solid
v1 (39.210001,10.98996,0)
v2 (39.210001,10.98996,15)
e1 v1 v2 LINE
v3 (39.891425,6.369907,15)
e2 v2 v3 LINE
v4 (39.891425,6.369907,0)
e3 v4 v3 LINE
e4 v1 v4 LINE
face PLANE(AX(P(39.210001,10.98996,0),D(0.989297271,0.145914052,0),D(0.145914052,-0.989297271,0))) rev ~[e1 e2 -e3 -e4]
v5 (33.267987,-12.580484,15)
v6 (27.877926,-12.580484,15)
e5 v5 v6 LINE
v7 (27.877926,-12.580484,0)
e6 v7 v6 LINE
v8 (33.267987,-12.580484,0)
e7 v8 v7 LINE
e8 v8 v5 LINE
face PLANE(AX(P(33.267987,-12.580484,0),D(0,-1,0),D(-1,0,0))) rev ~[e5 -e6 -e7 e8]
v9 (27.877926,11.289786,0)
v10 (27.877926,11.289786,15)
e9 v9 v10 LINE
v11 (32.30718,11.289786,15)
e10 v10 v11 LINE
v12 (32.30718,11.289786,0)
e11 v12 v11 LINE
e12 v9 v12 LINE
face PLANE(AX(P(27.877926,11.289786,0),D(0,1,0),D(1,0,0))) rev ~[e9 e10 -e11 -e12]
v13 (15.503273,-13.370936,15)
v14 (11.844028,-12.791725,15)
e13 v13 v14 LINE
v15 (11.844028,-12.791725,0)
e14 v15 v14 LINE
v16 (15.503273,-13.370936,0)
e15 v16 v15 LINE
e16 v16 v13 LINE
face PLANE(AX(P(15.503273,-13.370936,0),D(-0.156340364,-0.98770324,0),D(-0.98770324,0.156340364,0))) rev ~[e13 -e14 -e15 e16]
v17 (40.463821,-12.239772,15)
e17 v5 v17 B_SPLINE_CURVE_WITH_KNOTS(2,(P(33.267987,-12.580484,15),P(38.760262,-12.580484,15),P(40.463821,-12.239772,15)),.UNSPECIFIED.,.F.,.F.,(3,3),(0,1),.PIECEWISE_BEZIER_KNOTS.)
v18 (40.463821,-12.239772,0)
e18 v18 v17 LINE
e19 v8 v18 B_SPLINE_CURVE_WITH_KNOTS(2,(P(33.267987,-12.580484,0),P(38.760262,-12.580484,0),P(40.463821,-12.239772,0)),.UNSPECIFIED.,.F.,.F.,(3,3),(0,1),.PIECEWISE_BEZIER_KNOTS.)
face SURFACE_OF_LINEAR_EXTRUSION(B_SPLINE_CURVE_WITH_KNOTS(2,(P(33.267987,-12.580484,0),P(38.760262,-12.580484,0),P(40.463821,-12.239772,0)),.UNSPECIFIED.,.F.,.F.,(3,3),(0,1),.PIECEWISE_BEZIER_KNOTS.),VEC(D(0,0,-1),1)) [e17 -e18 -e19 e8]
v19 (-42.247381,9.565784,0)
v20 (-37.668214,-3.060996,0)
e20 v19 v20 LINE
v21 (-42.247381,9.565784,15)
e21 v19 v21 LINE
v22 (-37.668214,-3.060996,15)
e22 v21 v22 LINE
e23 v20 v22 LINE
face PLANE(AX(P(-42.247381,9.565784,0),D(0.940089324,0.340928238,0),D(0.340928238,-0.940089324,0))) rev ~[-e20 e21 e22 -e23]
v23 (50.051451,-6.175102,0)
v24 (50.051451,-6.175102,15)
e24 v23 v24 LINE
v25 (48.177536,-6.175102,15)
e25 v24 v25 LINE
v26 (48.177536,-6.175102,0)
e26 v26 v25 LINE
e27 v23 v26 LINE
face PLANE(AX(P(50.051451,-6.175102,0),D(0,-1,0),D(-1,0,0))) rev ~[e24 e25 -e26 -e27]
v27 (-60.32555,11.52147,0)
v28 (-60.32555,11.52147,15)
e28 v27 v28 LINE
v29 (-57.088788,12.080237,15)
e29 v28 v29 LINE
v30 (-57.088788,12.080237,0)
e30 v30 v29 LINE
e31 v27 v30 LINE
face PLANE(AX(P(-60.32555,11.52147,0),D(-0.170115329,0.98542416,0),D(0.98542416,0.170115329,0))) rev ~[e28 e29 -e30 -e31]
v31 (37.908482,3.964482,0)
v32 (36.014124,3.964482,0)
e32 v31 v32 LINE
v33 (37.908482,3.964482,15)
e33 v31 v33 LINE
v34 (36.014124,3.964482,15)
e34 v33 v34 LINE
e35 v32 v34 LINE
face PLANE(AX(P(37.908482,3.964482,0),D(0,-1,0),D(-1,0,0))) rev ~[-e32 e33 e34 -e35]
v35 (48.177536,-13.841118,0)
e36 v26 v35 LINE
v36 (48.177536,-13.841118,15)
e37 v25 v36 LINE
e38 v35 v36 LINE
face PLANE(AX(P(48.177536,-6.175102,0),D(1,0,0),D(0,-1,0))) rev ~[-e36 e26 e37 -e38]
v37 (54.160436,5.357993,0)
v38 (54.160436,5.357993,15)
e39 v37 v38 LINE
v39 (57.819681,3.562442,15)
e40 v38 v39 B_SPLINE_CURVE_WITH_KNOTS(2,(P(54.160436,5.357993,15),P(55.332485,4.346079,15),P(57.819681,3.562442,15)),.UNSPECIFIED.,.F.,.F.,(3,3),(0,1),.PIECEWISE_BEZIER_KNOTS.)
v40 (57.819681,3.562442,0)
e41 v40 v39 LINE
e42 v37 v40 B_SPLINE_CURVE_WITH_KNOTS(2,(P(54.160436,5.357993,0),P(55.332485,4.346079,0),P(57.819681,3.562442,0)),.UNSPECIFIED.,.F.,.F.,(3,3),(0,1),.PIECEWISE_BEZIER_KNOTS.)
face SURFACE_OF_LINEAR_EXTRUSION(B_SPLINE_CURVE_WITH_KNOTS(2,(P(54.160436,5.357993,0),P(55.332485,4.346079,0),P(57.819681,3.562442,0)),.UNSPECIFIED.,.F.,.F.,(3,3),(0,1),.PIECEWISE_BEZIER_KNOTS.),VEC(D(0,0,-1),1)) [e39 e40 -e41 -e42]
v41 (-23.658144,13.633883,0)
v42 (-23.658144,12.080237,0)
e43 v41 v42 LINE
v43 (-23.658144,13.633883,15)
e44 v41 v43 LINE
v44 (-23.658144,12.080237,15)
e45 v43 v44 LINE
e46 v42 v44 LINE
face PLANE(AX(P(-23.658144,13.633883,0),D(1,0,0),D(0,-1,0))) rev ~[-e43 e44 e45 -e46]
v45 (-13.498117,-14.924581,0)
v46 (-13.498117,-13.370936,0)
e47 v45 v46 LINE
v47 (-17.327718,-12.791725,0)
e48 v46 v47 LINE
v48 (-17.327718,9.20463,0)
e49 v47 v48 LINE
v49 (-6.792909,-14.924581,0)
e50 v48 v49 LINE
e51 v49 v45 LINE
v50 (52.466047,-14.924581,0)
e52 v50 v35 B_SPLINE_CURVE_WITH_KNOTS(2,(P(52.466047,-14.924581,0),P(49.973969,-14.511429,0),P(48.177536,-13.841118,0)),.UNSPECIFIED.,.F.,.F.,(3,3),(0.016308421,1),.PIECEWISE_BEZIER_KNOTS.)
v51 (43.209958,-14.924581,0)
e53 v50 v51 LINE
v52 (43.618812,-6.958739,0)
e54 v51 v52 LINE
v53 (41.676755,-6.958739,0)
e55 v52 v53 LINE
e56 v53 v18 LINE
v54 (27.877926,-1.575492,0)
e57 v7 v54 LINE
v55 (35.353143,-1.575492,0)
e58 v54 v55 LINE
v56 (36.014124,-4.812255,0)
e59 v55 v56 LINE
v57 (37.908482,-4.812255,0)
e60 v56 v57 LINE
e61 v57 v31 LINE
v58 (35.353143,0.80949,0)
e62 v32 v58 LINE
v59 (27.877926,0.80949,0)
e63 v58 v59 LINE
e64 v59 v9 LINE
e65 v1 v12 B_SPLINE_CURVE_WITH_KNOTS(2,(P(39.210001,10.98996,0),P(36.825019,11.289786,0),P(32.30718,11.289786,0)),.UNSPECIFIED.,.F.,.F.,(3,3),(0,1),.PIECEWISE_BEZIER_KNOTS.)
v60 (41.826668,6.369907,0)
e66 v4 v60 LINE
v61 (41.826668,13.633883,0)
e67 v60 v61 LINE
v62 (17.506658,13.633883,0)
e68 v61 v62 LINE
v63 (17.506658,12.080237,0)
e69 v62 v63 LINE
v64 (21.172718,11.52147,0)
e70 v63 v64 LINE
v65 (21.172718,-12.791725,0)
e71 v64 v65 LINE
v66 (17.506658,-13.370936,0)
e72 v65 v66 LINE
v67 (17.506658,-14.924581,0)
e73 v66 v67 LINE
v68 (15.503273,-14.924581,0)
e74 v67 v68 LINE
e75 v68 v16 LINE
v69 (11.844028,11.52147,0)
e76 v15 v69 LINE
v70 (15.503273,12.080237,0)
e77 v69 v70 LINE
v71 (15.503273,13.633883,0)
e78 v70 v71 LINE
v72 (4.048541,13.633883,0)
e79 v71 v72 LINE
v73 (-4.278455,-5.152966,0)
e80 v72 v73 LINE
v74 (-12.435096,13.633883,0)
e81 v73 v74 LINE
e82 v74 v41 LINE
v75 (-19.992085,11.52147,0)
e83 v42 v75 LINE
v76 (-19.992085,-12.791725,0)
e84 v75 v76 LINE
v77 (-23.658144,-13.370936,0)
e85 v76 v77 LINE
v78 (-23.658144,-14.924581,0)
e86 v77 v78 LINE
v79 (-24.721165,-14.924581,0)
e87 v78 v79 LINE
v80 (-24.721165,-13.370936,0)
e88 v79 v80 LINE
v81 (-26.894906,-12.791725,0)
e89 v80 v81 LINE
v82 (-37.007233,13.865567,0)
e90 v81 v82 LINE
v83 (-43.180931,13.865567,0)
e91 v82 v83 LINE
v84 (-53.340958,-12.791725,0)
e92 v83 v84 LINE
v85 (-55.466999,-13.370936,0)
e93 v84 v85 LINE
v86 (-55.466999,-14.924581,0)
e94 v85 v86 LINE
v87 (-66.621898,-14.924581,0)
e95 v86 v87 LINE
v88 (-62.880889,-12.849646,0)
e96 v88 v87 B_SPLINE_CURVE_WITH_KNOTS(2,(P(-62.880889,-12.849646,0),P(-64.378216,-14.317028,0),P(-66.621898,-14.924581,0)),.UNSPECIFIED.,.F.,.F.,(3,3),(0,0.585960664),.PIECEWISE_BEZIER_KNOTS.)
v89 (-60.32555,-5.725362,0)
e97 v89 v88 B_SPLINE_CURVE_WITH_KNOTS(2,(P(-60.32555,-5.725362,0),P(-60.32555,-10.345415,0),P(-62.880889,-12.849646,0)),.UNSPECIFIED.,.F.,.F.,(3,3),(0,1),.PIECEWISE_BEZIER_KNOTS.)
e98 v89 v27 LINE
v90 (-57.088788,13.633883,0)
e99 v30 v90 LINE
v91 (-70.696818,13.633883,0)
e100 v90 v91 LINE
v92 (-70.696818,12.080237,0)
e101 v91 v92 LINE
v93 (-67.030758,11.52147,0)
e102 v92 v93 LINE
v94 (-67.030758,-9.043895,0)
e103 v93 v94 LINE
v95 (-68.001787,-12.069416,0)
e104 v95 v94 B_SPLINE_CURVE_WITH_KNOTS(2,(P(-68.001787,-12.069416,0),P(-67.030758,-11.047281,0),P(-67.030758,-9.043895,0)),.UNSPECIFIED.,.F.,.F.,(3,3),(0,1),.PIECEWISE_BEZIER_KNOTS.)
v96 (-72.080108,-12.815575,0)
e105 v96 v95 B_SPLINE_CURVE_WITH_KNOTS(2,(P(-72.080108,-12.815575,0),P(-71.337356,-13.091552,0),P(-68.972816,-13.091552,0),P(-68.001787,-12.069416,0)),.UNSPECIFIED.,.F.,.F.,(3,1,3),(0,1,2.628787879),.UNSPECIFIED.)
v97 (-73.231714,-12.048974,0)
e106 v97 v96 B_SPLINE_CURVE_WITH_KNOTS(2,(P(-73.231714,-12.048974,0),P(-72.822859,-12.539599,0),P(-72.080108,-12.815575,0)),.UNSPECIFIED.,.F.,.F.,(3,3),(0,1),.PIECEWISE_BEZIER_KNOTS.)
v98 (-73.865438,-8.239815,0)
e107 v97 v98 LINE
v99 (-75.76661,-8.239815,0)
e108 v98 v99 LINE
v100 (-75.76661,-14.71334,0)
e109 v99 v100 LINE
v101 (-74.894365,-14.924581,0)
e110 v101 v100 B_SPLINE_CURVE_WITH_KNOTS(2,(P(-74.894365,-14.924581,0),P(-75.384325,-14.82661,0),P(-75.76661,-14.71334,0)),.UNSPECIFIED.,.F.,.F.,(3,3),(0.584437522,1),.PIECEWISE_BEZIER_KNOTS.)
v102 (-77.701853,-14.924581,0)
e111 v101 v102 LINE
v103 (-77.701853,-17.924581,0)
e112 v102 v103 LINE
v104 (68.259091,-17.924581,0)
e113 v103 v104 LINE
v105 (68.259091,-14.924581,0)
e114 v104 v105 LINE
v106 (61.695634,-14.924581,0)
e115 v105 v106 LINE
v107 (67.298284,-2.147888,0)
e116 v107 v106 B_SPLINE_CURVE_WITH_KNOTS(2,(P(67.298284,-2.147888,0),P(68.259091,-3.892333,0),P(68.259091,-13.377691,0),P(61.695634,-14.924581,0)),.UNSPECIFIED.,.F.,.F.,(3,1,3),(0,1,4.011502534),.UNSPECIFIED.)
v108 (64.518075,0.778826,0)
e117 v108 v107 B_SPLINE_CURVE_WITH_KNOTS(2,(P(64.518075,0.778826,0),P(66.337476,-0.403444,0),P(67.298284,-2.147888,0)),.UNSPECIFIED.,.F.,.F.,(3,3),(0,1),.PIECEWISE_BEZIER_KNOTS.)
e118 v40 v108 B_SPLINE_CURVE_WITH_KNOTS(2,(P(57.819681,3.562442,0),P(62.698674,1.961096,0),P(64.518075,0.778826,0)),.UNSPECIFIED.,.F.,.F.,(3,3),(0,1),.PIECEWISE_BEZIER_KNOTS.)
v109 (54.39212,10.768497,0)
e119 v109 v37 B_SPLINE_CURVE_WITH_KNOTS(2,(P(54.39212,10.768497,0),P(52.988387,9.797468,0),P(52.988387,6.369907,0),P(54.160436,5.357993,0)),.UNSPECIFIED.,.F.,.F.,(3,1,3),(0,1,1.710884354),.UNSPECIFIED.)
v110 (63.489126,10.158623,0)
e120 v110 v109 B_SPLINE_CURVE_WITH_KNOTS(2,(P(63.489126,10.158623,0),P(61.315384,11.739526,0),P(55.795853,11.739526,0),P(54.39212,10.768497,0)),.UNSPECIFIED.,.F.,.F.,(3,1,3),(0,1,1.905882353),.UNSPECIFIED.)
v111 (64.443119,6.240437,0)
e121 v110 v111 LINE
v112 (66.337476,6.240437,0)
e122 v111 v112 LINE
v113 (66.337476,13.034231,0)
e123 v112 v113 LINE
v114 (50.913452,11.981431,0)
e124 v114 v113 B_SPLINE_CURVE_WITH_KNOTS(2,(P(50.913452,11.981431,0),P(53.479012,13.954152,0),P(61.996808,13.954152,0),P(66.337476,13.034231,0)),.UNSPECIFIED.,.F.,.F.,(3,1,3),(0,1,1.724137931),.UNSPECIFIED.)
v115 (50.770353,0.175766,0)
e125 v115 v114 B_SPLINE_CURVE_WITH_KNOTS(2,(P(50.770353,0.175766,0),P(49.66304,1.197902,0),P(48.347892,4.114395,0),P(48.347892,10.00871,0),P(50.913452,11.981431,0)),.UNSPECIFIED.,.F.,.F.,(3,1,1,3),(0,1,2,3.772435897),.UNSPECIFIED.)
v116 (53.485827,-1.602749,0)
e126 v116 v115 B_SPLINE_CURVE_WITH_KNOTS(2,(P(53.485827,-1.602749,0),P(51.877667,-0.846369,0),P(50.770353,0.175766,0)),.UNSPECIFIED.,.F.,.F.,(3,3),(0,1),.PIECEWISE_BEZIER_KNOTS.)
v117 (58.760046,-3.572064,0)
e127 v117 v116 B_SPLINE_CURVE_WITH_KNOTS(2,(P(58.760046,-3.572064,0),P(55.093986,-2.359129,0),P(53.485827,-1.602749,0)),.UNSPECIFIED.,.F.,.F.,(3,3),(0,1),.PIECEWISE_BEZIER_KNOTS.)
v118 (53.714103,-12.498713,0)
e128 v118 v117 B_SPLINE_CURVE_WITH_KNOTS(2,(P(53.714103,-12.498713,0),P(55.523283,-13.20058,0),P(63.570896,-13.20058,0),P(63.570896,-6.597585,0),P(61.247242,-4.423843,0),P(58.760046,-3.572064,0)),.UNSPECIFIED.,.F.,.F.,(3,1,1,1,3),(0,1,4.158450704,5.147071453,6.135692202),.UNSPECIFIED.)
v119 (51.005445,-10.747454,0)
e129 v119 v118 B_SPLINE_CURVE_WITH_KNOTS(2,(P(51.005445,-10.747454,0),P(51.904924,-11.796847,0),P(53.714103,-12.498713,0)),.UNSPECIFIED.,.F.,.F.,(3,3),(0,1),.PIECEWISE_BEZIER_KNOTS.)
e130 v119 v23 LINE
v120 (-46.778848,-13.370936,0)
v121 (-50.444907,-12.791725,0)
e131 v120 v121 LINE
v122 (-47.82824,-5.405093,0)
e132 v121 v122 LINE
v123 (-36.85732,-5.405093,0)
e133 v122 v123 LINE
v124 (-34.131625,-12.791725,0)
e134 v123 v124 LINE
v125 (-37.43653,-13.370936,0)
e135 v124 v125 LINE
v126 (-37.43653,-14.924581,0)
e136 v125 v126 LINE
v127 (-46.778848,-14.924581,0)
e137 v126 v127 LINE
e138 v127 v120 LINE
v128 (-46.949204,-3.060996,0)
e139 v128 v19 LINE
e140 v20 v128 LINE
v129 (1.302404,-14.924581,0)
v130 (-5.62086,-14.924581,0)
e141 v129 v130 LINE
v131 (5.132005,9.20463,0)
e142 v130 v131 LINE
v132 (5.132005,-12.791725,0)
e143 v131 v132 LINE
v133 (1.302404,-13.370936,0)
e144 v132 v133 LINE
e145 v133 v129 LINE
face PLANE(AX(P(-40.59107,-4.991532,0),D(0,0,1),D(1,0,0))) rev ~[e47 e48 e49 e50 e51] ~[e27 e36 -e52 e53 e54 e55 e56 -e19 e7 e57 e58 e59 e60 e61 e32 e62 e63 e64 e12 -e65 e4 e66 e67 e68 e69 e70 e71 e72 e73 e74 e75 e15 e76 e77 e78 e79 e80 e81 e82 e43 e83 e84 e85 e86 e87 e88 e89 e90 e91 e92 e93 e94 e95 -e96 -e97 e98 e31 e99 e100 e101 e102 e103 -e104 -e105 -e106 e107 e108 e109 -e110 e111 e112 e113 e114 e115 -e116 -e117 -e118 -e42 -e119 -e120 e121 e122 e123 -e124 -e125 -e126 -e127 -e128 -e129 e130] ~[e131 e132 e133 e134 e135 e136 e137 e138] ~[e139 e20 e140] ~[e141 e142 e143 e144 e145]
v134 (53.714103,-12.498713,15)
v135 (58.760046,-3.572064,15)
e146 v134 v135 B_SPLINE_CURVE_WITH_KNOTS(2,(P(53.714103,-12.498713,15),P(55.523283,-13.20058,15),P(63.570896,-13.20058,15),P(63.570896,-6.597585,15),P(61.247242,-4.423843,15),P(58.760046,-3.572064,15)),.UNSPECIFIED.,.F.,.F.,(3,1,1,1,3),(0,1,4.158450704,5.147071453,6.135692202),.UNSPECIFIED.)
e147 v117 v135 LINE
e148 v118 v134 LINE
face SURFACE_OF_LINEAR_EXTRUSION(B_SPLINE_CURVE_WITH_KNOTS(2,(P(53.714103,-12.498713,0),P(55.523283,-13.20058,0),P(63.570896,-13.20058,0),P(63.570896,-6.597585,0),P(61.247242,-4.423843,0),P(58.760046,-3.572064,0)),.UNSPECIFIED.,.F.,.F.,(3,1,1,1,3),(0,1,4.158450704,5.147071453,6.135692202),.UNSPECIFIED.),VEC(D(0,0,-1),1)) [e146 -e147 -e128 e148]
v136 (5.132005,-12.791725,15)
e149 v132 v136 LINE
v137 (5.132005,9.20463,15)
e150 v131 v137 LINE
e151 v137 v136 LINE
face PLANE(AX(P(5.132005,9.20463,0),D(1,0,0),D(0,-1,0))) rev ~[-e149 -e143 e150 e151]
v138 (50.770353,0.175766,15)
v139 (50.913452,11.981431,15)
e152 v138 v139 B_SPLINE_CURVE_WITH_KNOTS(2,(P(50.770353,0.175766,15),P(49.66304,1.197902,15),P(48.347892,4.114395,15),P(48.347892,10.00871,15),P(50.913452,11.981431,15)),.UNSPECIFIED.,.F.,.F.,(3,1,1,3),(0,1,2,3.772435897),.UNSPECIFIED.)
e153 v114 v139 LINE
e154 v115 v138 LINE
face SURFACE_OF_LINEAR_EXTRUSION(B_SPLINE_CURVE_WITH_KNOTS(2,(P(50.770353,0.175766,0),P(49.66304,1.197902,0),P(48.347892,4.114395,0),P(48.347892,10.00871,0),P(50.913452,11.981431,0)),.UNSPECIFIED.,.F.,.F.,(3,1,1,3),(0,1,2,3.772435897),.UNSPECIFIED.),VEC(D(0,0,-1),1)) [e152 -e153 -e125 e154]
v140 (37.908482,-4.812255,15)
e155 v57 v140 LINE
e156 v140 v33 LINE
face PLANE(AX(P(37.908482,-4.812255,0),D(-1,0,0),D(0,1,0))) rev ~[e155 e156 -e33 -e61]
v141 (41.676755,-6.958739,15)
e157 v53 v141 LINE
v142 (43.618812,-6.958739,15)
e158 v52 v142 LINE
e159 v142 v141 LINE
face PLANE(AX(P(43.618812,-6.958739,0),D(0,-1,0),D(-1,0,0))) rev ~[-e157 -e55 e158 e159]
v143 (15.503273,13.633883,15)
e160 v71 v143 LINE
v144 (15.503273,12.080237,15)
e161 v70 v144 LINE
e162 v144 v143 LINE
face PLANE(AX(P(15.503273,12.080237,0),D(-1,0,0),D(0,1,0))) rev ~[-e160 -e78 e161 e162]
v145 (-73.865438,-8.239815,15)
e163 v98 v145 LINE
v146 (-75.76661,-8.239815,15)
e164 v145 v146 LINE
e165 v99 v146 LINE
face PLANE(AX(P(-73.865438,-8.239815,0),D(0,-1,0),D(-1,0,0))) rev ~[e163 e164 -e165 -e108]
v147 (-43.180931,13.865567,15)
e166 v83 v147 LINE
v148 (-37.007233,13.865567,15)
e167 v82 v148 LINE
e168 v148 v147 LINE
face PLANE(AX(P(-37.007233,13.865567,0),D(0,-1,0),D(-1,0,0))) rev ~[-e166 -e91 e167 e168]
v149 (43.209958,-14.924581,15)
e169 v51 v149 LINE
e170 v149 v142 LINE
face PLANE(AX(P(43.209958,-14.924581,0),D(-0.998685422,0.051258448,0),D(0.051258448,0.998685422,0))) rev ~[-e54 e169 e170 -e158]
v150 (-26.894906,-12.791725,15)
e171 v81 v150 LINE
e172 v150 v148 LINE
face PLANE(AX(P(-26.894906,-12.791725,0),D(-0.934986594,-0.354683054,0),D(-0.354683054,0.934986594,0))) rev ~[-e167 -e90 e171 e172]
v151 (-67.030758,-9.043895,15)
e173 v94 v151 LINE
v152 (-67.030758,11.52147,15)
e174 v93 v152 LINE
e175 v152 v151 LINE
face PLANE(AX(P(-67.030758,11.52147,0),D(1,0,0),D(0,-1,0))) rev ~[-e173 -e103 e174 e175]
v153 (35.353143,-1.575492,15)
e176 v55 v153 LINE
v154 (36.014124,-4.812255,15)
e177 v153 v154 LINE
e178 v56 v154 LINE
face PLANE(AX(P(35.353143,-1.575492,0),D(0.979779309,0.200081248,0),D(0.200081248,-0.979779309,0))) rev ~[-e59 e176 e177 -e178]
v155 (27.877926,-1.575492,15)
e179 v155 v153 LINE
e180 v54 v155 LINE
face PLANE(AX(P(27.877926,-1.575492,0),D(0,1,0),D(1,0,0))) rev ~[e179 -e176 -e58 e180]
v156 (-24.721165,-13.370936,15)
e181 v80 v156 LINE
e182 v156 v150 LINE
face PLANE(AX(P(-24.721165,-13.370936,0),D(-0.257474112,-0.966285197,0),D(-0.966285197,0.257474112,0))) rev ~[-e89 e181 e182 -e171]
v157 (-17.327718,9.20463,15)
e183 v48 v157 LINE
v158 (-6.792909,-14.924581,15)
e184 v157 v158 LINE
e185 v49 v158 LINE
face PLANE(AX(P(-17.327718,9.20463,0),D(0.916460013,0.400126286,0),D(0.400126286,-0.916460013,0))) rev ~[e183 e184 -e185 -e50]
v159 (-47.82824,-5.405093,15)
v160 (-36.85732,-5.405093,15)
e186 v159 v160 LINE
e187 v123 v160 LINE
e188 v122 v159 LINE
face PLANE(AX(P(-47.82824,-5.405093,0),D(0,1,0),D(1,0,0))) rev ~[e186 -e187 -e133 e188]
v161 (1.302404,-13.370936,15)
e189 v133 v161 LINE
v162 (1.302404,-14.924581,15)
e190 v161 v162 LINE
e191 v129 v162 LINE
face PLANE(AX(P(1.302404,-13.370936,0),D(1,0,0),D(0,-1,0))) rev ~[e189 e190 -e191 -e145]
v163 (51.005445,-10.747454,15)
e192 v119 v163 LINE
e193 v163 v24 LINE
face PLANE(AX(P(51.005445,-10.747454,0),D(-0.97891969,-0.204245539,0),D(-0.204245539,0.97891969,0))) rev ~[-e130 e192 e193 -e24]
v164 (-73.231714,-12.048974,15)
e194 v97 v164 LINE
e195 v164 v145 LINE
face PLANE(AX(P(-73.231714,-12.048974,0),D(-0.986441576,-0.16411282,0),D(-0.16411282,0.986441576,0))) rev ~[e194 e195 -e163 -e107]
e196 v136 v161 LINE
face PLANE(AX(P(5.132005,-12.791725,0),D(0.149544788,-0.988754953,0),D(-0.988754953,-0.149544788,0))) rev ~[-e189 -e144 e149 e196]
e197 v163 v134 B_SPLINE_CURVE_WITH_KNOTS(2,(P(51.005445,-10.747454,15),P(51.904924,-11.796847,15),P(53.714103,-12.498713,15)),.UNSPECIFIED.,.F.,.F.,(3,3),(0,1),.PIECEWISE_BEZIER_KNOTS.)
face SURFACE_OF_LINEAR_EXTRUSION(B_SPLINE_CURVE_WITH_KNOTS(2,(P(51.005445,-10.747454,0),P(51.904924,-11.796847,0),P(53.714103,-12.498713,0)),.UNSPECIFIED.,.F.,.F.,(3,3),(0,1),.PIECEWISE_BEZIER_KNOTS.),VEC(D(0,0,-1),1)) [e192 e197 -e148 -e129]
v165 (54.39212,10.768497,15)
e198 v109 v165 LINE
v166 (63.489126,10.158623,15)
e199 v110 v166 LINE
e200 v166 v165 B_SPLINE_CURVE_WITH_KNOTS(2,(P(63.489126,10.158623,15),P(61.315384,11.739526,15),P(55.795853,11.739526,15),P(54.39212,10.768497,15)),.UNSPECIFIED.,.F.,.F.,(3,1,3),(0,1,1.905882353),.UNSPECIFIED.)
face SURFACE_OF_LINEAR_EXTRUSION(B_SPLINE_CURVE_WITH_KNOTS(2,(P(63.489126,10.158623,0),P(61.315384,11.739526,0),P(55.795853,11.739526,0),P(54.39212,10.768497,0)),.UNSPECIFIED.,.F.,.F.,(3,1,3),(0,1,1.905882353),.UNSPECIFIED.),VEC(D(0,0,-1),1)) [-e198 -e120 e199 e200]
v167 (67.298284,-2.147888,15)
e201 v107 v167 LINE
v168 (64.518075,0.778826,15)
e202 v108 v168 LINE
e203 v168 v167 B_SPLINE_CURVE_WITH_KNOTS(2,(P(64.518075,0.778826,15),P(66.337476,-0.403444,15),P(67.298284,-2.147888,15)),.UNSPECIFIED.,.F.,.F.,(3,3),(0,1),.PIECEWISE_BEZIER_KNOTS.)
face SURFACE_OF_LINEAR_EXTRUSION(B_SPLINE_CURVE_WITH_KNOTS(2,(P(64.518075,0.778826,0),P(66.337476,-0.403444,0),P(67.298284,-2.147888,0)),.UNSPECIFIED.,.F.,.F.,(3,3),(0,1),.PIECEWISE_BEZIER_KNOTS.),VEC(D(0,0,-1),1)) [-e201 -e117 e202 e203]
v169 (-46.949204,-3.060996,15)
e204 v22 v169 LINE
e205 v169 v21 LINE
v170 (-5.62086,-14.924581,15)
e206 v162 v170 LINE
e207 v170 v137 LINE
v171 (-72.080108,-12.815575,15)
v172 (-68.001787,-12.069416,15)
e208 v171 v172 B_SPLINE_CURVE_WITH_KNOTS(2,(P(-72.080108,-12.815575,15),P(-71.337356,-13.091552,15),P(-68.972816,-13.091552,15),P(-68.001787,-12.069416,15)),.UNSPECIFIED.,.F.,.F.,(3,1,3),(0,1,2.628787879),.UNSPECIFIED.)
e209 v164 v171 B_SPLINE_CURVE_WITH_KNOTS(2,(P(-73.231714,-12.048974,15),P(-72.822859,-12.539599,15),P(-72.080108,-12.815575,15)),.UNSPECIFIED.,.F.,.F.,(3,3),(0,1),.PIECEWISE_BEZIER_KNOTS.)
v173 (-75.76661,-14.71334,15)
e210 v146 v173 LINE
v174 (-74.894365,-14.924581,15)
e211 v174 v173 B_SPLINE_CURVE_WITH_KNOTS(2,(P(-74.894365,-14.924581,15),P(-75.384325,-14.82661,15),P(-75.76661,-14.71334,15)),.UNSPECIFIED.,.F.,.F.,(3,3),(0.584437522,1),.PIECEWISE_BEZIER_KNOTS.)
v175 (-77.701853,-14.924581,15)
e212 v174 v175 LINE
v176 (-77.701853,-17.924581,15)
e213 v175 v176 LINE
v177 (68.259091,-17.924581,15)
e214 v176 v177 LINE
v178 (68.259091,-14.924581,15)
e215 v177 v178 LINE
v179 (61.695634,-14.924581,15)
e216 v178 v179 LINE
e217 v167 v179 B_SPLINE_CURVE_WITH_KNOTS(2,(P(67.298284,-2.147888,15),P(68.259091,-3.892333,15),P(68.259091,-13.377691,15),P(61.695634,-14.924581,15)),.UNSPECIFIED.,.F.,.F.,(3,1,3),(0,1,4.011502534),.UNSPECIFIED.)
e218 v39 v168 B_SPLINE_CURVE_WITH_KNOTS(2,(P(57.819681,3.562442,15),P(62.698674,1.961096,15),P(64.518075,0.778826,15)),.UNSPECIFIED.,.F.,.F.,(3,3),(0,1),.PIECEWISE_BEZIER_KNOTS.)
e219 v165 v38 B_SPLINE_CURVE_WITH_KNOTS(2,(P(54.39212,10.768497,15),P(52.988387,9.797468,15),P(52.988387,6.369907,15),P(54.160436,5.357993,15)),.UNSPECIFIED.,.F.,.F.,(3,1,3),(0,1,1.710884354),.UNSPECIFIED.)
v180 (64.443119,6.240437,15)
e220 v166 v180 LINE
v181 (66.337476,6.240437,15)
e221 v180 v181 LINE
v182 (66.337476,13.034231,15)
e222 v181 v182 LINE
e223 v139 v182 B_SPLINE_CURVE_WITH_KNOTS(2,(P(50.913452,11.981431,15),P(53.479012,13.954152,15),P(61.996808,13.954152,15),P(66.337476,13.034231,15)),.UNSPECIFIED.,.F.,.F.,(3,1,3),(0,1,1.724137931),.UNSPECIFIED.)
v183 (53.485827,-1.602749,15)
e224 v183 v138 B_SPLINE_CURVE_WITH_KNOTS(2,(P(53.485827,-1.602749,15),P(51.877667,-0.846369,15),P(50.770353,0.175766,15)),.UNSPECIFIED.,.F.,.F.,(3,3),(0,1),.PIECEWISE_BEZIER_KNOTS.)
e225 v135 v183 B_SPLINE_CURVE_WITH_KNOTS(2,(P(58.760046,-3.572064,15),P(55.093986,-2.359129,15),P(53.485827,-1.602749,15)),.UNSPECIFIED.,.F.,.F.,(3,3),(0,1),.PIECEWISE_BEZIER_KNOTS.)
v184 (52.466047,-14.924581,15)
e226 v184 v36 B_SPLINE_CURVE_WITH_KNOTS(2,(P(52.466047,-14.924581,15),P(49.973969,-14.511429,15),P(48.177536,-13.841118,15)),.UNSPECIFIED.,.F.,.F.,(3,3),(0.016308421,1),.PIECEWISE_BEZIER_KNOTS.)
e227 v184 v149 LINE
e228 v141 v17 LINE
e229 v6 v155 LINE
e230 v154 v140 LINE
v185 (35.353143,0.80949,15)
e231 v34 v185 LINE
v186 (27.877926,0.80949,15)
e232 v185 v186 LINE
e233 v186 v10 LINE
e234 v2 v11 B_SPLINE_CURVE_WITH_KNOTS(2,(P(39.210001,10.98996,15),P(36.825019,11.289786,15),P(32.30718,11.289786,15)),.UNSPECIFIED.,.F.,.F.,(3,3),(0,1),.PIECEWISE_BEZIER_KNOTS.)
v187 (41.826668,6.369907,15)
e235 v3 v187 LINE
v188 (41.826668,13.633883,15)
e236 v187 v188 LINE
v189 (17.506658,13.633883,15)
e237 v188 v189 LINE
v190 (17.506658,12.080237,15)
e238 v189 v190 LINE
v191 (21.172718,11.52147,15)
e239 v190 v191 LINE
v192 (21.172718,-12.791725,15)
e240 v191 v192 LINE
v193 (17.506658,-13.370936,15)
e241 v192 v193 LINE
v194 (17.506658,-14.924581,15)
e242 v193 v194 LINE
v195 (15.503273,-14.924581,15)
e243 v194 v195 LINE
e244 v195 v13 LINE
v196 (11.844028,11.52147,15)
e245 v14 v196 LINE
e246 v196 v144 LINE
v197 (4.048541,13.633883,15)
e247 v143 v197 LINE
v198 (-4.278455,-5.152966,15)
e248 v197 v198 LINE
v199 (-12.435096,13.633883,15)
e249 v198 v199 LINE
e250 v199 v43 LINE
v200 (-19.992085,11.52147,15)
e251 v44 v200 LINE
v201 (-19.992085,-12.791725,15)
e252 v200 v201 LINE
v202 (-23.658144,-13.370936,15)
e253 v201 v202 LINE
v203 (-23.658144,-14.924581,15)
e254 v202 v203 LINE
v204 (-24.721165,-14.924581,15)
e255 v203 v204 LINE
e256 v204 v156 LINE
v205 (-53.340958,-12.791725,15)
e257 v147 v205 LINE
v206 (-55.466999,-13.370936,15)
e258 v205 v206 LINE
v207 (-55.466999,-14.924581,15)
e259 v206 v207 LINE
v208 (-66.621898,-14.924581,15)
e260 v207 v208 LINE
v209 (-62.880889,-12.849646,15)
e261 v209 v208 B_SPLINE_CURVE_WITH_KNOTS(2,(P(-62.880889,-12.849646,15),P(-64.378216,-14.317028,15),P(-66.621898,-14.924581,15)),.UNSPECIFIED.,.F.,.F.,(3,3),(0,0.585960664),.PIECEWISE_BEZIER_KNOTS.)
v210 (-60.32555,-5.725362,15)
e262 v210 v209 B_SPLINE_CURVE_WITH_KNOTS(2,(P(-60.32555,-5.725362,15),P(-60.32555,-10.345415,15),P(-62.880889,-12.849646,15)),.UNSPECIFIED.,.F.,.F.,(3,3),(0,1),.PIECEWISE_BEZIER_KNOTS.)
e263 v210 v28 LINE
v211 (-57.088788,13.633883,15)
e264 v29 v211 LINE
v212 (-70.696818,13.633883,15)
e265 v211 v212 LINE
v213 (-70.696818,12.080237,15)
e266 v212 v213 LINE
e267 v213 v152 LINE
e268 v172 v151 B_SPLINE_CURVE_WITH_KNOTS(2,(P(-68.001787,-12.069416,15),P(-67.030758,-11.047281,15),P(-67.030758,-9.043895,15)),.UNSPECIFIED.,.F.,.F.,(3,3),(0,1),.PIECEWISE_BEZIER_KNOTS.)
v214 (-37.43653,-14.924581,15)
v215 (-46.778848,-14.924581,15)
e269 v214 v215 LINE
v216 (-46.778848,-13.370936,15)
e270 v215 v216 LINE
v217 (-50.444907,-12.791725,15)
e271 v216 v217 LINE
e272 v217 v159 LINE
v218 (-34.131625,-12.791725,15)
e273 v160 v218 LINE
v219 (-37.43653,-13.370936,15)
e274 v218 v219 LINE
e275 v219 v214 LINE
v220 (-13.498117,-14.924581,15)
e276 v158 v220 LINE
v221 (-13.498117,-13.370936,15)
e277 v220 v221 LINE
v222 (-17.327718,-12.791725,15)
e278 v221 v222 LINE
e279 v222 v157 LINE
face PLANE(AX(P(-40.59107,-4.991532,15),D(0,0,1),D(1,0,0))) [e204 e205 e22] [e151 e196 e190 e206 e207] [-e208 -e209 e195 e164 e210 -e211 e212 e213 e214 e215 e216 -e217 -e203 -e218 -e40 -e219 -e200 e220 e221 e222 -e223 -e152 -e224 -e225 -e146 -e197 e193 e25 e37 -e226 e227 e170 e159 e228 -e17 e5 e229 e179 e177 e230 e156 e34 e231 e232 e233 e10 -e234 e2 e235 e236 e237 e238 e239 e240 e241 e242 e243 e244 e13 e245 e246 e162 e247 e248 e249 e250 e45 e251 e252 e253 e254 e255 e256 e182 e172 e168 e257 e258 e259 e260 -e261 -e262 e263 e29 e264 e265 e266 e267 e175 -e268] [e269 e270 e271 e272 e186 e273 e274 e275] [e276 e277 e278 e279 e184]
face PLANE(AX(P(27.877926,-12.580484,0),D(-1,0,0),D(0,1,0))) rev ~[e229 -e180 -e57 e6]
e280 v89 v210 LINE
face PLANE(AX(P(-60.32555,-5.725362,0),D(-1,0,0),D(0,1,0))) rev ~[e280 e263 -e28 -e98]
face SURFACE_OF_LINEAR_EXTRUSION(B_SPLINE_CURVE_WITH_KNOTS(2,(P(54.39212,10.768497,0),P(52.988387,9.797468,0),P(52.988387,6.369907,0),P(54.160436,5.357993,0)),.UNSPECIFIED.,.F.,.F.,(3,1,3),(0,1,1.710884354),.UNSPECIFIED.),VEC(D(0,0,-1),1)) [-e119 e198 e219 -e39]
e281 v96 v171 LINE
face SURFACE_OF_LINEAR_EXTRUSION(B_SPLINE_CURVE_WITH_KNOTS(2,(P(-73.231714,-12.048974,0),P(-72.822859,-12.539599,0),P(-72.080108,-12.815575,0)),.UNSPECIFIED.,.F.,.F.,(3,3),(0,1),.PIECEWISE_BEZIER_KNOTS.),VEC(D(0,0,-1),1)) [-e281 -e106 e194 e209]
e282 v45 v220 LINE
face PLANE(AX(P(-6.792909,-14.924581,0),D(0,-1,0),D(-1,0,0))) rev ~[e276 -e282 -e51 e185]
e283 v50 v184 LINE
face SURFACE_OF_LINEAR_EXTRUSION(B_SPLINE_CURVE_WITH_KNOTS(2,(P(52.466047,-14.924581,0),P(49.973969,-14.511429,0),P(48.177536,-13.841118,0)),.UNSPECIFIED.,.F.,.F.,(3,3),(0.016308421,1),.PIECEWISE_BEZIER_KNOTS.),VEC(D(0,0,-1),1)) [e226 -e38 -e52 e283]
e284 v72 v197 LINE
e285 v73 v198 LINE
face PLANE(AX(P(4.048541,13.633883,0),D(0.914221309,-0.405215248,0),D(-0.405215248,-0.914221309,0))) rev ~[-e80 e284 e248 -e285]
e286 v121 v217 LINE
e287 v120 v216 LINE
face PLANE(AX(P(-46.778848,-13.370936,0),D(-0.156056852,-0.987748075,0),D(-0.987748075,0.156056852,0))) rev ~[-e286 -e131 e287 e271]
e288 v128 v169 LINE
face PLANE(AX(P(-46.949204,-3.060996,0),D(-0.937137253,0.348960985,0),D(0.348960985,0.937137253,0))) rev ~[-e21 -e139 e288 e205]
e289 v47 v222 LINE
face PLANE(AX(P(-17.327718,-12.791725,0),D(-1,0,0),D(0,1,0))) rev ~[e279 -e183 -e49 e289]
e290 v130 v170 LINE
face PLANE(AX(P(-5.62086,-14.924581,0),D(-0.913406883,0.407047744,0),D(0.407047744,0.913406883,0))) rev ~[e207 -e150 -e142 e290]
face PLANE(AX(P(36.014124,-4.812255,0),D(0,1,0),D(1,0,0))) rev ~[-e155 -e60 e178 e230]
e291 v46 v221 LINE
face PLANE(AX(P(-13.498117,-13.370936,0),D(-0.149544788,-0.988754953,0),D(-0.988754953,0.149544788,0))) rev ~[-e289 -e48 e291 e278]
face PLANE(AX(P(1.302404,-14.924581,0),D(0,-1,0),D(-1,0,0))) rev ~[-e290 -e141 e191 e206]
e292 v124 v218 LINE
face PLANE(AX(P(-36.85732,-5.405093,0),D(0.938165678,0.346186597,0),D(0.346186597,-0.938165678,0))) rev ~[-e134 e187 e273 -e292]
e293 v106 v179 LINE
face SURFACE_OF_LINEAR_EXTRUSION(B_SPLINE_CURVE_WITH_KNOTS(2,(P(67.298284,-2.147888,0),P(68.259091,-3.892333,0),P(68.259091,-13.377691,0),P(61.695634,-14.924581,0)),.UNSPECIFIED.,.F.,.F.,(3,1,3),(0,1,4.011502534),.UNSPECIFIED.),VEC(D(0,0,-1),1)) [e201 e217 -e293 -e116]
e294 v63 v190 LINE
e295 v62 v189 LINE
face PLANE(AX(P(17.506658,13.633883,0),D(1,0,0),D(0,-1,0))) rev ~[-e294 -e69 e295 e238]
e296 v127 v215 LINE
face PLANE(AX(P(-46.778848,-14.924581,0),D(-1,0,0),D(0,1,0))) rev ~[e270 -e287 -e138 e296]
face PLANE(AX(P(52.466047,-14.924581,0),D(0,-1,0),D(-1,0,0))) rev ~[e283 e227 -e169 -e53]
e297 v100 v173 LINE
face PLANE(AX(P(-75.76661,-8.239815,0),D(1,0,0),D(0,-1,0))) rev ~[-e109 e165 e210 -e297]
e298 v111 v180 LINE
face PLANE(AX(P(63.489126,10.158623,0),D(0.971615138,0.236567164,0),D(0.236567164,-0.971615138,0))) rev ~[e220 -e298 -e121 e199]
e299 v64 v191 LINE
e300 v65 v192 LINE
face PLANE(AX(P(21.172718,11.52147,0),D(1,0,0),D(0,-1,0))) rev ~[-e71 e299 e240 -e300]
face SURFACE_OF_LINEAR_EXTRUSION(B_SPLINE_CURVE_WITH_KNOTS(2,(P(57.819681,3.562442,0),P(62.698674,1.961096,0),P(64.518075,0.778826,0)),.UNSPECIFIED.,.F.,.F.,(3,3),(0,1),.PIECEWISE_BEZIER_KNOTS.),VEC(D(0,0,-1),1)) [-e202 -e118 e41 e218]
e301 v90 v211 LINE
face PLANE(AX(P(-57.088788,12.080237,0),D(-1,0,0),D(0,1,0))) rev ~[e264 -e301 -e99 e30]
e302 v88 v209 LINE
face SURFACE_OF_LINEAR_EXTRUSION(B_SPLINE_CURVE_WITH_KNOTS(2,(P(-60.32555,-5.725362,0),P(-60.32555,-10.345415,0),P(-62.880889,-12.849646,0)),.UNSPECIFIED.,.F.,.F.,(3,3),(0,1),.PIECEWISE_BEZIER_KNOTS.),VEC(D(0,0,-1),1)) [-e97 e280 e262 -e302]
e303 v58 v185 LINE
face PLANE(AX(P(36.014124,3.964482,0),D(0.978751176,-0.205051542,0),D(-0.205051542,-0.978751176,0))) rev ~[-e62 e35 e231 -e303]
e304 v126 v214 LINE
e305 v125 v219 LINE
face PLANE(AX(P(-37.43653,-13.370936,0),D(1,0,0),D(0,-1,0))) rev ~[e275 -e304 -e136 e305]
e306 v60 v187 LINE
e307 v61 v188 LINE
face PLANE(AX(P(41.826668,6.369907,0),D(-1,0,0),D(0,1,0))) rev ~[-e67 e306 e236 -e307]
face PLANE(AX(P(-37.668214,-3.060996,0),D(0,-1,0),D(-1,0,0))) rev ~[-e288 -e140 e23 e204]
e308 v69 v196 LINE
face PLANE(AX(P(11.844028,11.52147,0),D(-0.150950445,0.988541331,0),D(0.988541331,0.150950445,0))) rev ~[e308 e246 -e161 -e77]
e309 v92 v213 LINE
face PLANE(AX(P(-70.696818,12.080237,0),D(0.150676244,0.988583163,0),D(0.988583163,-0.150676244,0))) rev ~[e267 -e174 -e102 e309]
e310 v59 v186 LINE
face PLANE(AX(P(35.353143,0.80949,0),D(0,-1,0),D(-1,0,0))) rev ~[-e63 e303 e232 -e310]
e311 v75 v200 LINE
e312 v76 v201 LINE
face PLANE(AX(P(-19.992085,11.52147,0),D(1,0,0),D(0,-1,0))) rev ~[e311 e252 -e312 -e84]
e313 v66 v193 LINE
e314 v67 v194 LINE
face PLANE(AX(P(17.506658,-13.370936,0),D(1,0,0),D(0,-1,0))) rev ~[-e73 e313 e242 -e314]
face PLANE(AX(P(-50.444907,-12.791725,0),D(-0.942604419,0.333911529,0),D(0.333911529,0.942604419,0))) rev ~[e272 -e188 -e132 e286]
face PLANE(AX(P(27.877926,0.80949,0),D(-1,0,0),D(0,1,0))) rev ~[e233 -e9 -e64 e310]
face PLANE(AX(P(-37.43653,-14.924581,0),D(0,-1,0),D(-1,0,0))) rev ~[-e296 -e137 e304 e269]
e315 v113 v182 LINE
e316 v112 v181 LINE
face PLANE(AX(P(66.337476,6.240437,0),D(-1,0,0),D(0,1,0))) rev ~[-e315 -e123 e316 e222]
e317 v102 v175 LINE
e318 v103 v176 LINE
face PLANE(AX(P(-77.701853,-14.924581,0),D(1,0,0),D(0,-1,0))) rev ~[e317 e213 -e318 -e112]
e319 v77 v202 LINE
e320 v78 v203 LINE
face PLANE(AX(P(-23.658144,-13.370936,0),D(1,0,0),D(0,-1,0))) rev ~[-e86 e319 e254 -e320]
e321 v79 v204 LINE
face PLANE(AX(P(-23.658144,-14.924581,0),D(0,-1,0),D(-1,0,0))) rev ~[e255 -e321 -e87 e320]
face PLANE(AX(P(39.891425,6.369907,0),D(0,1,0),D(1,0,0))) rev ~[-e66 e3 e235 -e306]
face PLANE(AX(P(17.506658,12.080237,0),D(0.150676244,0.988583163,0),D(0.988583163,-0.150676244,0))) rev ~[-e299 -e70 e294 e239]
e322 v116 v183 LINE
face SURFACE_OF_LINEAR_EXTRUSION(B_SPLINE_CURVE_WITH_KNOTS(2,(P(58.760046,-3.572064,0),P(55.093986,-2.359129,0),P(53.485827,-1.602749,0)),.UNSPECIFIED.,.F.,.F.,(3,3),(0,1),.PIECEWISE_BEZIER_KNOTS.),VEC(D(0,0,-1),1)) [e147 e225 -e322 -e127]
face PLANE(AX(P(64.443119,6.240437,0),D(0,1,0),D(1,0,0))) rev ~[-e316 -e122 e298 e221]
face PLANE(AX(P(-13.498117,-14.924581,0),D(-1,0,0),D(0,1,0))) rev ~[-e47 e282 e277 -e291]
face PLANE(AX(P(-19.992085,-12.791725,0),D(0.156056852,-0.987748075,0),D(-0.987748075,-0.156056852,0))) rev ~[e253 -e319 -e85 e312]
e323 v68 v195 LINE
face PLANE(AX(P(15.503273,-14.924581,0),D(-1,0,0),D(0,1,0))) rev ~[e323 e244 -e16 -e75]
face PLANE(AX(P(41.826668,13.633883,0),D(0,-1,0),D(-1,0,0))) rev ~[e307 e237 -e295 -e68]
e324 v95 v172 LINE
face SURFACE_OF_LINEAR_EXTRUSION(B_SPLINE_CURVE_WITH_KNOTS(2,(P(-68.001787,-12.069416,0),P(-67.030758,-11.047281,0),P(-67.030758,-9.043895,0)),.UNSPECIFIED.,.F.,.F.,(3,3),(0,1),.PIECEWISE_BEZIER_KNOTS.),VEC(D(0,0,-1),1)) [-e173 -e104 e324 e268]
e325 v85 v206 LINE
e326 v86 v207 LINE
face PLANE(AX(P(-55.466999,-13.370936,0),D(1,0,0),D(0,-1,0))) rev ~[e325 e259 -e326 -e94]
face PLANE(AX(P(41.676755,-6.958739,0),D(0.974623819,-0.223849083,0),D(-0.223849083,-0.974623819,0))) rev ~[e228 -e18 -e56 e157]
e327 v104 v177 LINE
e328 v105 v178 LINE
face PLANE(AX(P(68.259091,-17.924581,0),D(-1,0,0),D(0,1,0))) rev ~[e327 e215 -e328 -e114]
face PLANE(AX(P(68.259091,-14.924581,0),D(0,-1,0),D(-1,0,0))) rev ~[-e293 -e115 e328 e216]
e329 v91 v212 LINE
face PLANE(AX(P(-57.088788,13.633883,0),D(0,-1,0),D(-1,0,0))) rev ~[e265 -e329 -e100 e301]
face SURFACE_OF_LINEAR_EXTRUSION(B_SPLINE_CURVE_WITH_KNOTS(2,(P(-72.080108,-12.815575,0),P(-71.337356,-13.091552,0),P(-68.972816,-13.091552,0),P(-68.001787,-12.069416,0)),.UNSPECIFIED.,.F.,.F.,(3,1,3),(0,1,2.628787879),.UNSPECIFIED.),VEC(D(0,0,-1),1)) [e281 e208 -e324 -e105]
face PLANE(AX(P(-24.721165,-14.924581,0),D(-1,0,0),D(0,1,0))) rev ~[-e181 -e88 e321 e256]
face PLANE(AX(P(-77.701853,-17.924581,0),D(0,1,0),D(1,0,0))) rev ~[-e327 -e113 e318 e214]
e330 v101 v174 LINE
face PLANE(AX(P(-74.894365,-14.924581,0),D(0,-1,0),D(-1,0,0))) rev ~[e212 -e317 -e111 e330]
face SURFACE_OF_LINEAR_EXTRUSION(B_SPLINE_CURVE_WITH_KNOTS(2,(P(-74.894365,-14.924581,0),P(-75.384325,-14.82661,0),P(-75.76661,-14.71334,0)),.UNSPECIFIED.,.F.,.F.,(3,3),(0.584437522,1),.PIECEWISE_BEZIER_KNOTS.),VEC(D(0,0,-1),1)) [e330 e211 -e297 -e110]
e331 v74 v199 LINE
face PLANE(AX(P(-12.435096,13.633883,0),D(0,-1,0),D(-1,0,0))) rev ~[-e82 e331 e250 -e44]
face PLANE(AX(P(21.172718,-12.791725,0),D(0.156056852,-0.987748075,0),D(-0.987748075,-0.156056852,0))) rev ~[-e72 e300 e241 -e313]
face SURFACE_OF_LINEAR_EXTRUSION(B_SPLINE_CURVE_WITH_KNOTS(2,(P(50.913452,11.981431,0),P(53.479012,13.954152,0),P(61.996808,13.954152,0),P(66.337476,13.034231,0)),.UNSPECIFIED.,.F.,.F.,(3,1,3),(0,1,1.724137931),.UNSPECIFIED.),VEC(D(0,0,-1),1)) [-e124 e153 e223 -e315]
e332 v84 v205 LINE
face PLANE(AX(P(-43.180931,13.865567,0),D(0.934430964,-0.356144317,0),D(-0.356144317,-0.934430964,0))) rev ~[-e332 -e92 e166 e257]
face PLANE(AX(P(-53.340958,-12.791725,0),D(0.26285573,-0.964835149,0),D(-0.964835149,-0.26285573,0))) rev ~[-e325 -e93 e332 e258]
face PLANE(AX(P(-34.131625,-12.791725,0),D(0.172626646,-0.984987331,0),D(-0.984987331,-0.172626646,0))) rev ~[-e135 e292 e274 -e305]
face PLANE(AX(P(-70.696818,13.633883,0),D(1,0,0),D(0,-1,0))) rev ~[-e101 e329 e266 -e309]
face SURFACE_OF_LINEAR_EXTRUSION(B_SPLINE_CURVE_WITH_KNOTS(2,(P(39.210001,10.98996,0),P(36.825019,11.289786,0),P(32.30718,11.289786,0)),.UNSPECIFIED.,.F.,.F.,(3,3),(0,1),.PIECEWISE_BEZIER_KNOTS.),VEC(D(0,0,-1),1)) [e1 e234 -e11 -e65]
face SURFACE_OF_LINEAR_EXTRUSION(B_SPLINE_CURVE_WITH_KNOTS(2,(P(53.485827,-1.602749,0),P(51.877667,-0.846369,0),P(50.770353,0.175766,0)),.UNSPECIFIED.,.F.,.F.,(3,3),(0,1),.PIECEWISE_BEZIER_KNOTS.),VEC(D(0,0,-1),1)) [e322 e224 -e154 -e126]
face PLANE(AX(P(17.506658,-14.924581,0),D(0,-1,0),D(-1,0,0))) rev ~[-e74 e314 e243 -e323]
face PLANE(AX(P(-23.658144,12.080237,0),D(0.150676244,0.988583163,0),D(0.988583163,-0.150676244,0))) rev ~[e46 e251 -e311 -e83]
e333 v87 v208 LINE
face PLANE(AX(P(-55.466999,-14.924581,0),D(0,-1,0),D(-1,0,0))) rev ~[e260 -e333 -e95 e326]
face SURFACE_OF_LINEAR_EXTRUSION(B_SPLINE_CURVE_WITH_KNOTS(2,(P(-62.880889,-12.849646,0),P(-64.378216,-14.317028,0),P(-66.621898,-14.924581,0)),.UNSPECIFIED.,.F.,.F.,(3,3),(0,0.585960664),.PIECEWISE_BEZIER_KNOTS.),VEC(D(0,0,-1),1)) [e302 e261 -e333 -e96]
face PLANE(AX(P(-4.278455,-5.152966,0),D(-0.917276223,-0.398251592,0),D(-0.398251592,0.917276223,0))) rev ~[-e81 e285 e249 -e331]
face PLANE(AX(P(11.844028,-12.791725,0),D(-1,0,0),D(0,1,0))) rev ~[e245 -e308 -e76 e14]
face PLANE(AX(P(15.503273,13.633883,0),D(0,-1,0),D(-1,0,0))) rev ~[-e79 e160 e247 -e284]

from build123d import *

# Parameters (mm, degrees)
F1_DEPTH = 15


with BuildPart() as f1:
    # F0 (on Top) → F1 (new body)
    with BuildSketch(Plane.XY):
        Polygon((-55.4669993083, -13.3709355081), (-55.4669993083, -14.9245814085), (-46.7788478918, -14.9245814085), (-46.7788478918, -13.3709355081), (-50.4449070777, -12.7917254137), (-47.8282402981, -5.4050931505), (-36.8573196859, -5.4050931505), (-34.1316251238, -12.7917254137), (-37.4365297803, -13.3709355081), (-37.4365297803, -14.9245814085), (-24.7211646484, -14.9245814085), (-24.7211646484, -13.3709355081), (-26.8949060616, -12.7917254137), (-37.0072328868, 13.8655674032), (-43.1809310698, 13.8655674032), (-53.3409575499, -12.7917254137), align=None)
        Polygon((-46.9492038019, -3.0609958272), (-42.2473806823, 9.5657842315), (-37.6682138181, -3.0609958272), align=None, mode=Mode.SUBTRACT)
        with BuildLine():
            Line((-46.7788478918, -14.9245814085), (-55.4669993083, -14.9245814085))
            Line((-55.4669993083, -14.9245814085), (-66.6218982829, -14.9245814085))
            add(Edge.make_bspline(
                [(-66.6218982829, -14.9245814085), (-68.2072820659, -15.353878302), (-70.1653072341, -15.353878302)],
                knots=[0.5859606644, 0.5859606644, 0.5859606644, 1, 1, 1], degree=2))
            add(Edge.make_bspline(
                [(-70.1653072341, -15.353878302), (-71.7598385529, -15.353878302), (-73.3032630987, -15.1698939191)],
                knots=[0, 0, 0, 1, 1, 1], degree=2))
            add(Edge.make_bspline(
                [(-73.3032630987, -15.1698939191), (-74.2052983154, -15.0623665423), (-74.8943654736, -14.9245814085)],
                knots=[0, 0, 0, 0.5844375218, 0.5844375218, 0.5844375218], degree=2))
            Line((-74.8943654736, -14.9245814085), (-77.7018526982, -14.9245814085))
            Line((-77.7018526982, -14.9245814085), (-77.7018526982, -17.9245814085))
            Line((-77.7018526982, -17.9245814085), (68.2590910996, -17.9245814085))
            Line((68.2590910996, -17.9245814085), (68.2590910996, -14.9245814085))
            Line((68.2590910996, -14.9245814085), (61.695634433, -14.9245814085))
            add(Edge.make_bspline(
                [(61.695634433, -14.9245814085), (59.8741275274, -15.353878302), (57.5471114707, -15.353878302)],
                knots=[0.7827650782, 0.7827650782, 0.7827650782, 1, 1, 1], degree=2))
            add(Edge.make_bspline(
                [(57.5471114707, -15.353878302), (55.0939863649, -15.353878302), (52.5488690676, -14.9382098813)],
                knots=[0, 0, 0, 1, 1, 1], degree=2))
            add(Edge.make_bspline(
                [(52.5488690676, -14.9382098813), (52.5073622228, -14.9314309856), (52.4660465805, -14.9245814085)],
                knots=[0, 0, 0, 0.0163084212, 0.0163084212, 0.0163084212], degree=2))
            Line((52.4660465805, -14.9245814085), (43.2099580743, -14.9245814085))
            Line((43.2099580743, -14.9245814085), (17.5066583542, -14.9245814085))
            Line((17.5066583542, -14.9245814085), (15.5032728511, -14.9245814085))
            Line((15.5032728511, -14.9245814085), (1.3024041828, -14.9245814085))
            Line((1.3024041828, -14.9245814085), (-5.6208600048, -14.9245814085))
            Line((-5.6208600048, -14.9245814085), (-6.7929086665, -14.9245814085))
            Line((-6.7929086665, -14.9245814085), (-13.4981172891, -14.9245814085))
            Line((-13.4981172891, -14.9245814085), (-23.6581437692, -14.9245814085))
            Line((-23.6581437692, -14.9245814085), (-24.7211646484, -14.9245814085))
            Line((-24.7211646484, -14.9245814085), (-37.4365297803, -14.9245814085))
            Line((-37.4365297803, -14.9245814085), (-46.7788478918, -14.9245814085))
        make_face()
        with BuildLine():
            add(Edge.make_bspline(
                [(-66.6218982829, -14.9245814085), (-68.2072820659, -15.353878302), (-70.1653072341, -15.353878302)],
                knots=[0.5859606644, 0.5859606644, 0.5859606644, 1, 1, 1], degree=2))
            Line((-66.6218982829, -14.9245814085), (-74.8943654736, -14.9245814085))
            add(Edge.make_bspline(
                [(-73.3032630987, -15.1698939191), (-74.2052983154, -15.0623665423), (-74.8943654736, -14.9245814085)],
                knots=[0, 0, 0, 0.5844375218, 0.5844375218, 0.5844375218], degree=2))
            add(Edge.make_bspline(
                [(-70.1653072341, -15.353878302), (-71.7598385529, -15.353878302), (-73.3032630987, -15.1698939191)],
                knots=[0, 0, 0, 1, 1, 1], degree=2))
        make_face()
        with BuildLine():
            Line((-74.8943654736, -14.9245814085), (-66.6218982829, -14.9245814085))
            add(Edge.make_bspline(
                [(-62.8808885171, -12.8496464231), (-64.3782164513, -14.3170277987), (-66.6218982829, -14.9245814085)],
                knots=[0, 0, 0, 0.5859606644, 0.5859606644, 0.5859606644], degree=2))
            add(Edge.make_bspline(
                [(-60.3255498651, -5.7253622616), (-60.3255498651, -10.3454145443), (-62.8808885171, -12.8496464231)],
                knots=[0, 0, 0, 1, 1, 1], degree=2))
            Line((-60.3255498651, -5.7253622616), (-60.3255498651, 11.5214700798))
            Line((-60.3255498651, 11.5214700798), (-57.0887875727, 12.080237465))
            Line((-57.0887875727, 12.080237465), (-57.0887875727, 13.6338833654))
            Line((-57.0887875727, 13.6338833654), (-70.6968176737, 13.6338833654))
            Line((-70.6968176737, 13.6338833654), (-70.6968176737, 12.080237465))
            Line((-70.6968176737, 12.080237465), (-67.0307584878, 11.5214700798))
            Line((-67.0307584878, 11.5214700798), (-67.0307584878, -9.0438953909))
            add(Edge.make_bspline(
                [(-68.0017871755, -12.0694163548), (-67.0307584878, -11.047280894), (-67.0307584878, -9.0438953909)],
                knots=[0, 0, 0, 1, 1, 1], degree=2))
            add(Edge.make_bspline(
                [(-70.4378766904, -13.0915518155), (-68.9728158632, -13.0915518155), (-68.0017871755, -12.0694163548)],
                knots=[0, 0, 0, 1, 1, 1], degree=2))
            add(Edge.make_bspline(
                [(-72.080107664, -12.8155752411), (-71.3373558958, -13.0915518155), (-70.4378766904, -13.0915518155)],
                knots=[0, 0, 0, 1, 1, 1], degree=2))
            add(Edge.make_bspline(
                [(-73.2317136165, -12.0489736455), (-72.8228594321, -12.5395986667), (-72.080107664, -12.8155752411)],
                knots=[0, 0, 0, 1, 1, 1], degree=2))
            Line((-73.2317136165, -12.0489736455), (-73.8654376021, -8.2398154951))
            Line((-73.8654376021, -8.2398154951), (-75.7666095592, -8.2398154951))
            Line((-75.7666095592, -8.2398154951), (-75.7666095592, -14.7133400799))
            add(Edge.make_bspline(
                [(-74.8943654736, -14.9245814085), (-75.3843245286, -14.8266097186), (-75.7666095592, -14.7133400799)],
                knots=[0.5844375218, 0.5844375218, 0.5844375218, 1, 1, 1], degree=2))
        make_face()
        Polygon((-23.6581437692, -13.3709355081), (-23.6581437692, -14.9245814085), (-13.4981172891, -14.9245814085), (-13.4981172891, -13.3709355081), (-17.3277181488, -12.7917254137), (-17.3277181488, 9.2046297021), (-6.7929086665, -14.9245814085), (-5.6208600048, -14.9245814085), (5.1320050425, 9.2046297021), (5.1320050425, -12.7917254137), (1.3024041828, -13.3709355081), (1.3024041828, -14.9245814085), (15.5032728511, -14.9245814085), (15.5032728511, -13.3709355081), (11.8440279016, -12.7917254137), (11.8440279016, 11.5214700798), (15.5032728511, 12.080237465), (15.5032728511, 13.6338833654), (4.0485414541, 13.6338833654), (-4.278455433, -5.1529664035), (-12.4350964099, 13.6338833654), (-23.6581437692, 13.6338833654), (-23.6581437692, 12.080237465), (-19.9920845832, 11.5214700798), (-19.9920845832, -12.7917254137), align=None)
        with BuildLine():
            add(Edge.make_bspline(
                [(61.695634433, -14.9245814085), (59.8741275274, -15.353878302), (57.5471114707, -15.353878302)],
                knots=[0.7827650782, 0.7827650782, 0.7827650782, 1, 1, 1], degree=2))
            Line((61.695634433, -14.9245814085), (52.4660465805, -14.9245814085))
            add(Edge.make_bspline(
                [(52.5488690676, -14.9382098813), (52.5073622228, -14.9314309856), (52.4660465805, -14.9245814085)],
                knots=[0, 0, 0, 0.0163084212, 0.0163084212, 0.0163084212], degree=2))
            add(Edge.make_bspline(
                [(57.5471114707, -15.353878302), (55.0939863649, -15.353878302), (52.5488690676, -14.9382098813)],
                knots=[0, 0, 0, 1, 1, 1], degree=2))
        make_face()
        with BuildLine():
            Line((52.4660465805, -14.9245814085), (61.695634433, -14.9245814085))
            add(Edge.make_bspline(
                [(68.2590910996, -6.2568727012), (68.2590910996, -13.377691002), (61.695634433, -14.9245814085)],
                knots=[0, 0, 0, 0.7827650782, 0.7827650782, 0.7827650782], degree=2))
            add(Edge.make_bspline(
                [(67.2982837665, -2.1478881489), (68.2590910996, -3.8923326686), (68.2590910996, -6.2568727012)],
                knots=[0, 0, 0, 1, 1, 1], degree=2))
            add(Edge.make_bspline(
                [(64.5180753132, 0.7788263871), (66.3374764333, -0.4034436292), (67.2982837665, -2.1478881489)],
                knots=[0, 0, 0, 1, 1, 1], degree=2))
            add(Edge.make_bspline(
                [(57.8196809269, 3.5624419586), (62.698674193, 1.9610964034), (64.5180753132, 0.7788263871)],
                knots=[0, 0, 0, 1, 1, 1], degree=2))
            add(Edge.make_bspline(
                [(54.1604359774, 5.3579932514), (55.3324846391, 4.3460791452), (57.8196809269, 3.5624419586)],
                knots=[0, 0, 0, 1, 1, 1], degree=2))
            add(Edge.make_bspline(
                [(52.9883873157, 7.7940827662), (52.9883873157, 6.3699073575), (54.1604359774, 5.3579932514)],
                knots=[0, 0, 0, 1, 1, 1], degree=2))
            add(Edge.make_bspline(
                [(54.3921200152, 10.768496957), (52.9883873157, 9.7974682693), (52.9883873157, 7.7940827662)],
                knots=[0, 0, 0, 1, 1, 1], degree=2))
            add(Edge.make_bspline(
                [(58.4193337306, 11.7395256448), (55.7958527146, 11.7395256448), (54.3921200152, 10.768496957)],
                knots=[0, 0, 0, 1, 1, 1], degree=2))
            add(Edge.make_bspline(
                [(63.489125616, 10.1586227988), (61.3153842028, 11.7395256448), (58.4193337306, 11.7395256448)],
                knots=[0, 0, 0, 1, 1, 1], degree=2))
            Line((63.489125616, 10.1586227988), (64.4431187127, 6.2404368658))
            Line((64.4431187127, 6.2404368658), (66.3374764333, 6.2404368658))
            Line((66.3374764333, 6.2404368658), (66.3374764333, 13.0342305617))
            add(Edge.make_bspline(
                [(58.4193337306, 13.9541524764), (61.9968078433, 13.9541524764), (66.3374764333, 13.0342305617)],
                knots=[0, 0, 0, 1, 1, 1], degree=2))
            add(Edge.make_bspline(
                [(50.9134523303, 11.9814310371), (53.4790123369, 13.9541524764), (58.4193337306, 13.9541524764)],
                knots=[0, 0, 0, 1, 1, 1], degree=2))
            add(Edge.make_bspline(
                [(48.3478923238, 6.2404368658), (48.3478923238, 10.0087095979), (50.9134523303, 11.9814310371)],
                knots=[0, 0, 0, 1, 1, 1], degree=2))
            add(Edge.make_bspline(
                [(49.0054661369, 2.6561485167), (48.3478923238, 4.1143951074), (48.3478923238, 6.2404368658)],
                knots=[0, 0, 0, 1, 1, 1], degree=2))
            add(Edge.make_bspline(
                [(50.7703533658, 0.1757664653), (49.66303995, 1.197901926), (49.0054661369, 2.6561485167)],
                knots=[0, 0, 0, 1, 1, 1], degree=2))
            add(Edge.make_bspline(
                [(53.4858265733, -1.6027492365), (51.8776667817, -0.8463689955), (50.7703533658, 0.1757664653)],
                knots=[0, 0, 0, 1, 1, 1], degree=2))
            add(Edge.make_bspline(
                [(58.7600455508, -3.5720635576), (55.0939863649, -2.3591294774), (53.4858265733, -1.6027492365)],
                knots=[0, 0, 0, 1, 1, 1], degree=2))
            add(Edge.make_bspline(
                [(62.4090691458, -5.5107138148), (61.2472418387, -4.4238431082), (58.7600455508, -3.5720635576)],
                knots=[0, 0, 0, 1, 1, 1], degree=2))
            add(Edge.make_bspline(
                [(63.5708964529, -8.171673131), (63.5708964529, -6.5975845214), (62.4090691458, -5.5107138148)],
                knots=[0, 0, 0, 1, 1, 1], degree=2))
            add(Edge.make_bspline(
                [(57.4585263975, -13.200579598), (63.5708964529, -13.200579598), (63.5708964529, -8.171673131)],
                knots=[0, 0, 0, 1, 1, 1], degree=2))
            add(Edge.make_bspline(
                [(53.7141034929, -12.4987132483), (55.5232832584, -13.200579598), (57.4585263975, -13.200579598)],
                knots=[0, 0, 0, 1, 1, 1], degree=2))
            add(Edge.make_bspline(
                [(51.0054445218, -10.7474544922), (51.9049237273, -11.7968468985), (53.7141034929, -12.4987132483)],
                knots=[0, 0, 0, 1, 1, 1], degree=2))
            Line((51.0054445218, -10.7474544922), (50.0514514251, -6.1751018643))
            Line((50.0514514251, -6.1751018643), (48.1775364137, -6.1751018643))
            Line((48.1775364137, -6.1751018643), (48.1775364137, -13.8411178201))
            add(Edge.make_bspline(
                [(52.4660465805, -14.9245814085), (49.9739690811, -14.5114285169), (48.1775364137, -13.8411178201)],
                knots=[0.0163084212, 0.0163084212, 0.0163084212, 1, 1, 1], degree=2))
        make_face()
        with BuildLine():
            Line((17.5066583542, -14.9245814085), (43.2099580743, -14.9245814085))
            Line((43.2099580743, -14.9245814085), (43.6188122587, -6.9587390509))
            Line((43.6188122587, -6.9587390509), (41.6767548832, -6.9587390509))
            Line((41.6767548832, -6.9587390509), (40.4638208031, -12.2397722649))
            add(Edge.make_bspline(
                [(33.2679871593, -12.5804840851), (38.7602617018, -12.5804840851), (40.4638208031, -12.2397722649)],
                knots=[0, 0, 0, 1, 1, 1], degree=2))
            Line((33.2679871593, -12.5804840851), (27.8779261628, -12.5804840851))
            Line((27.8779261628, -12.5804840851), (27.8779261628, -1.5754922909))
            Line((27.8779261628, -1.5754922909), (35.3531434992, -1.5754922909))
            Line((35.3531434992, -1.5754922909), (36.0141244305, -4.8122545833))
            Line((36.0141244305, -4.8122545833), (37.9084821512, -4.8122545833))
            Line((37.9084821512, -4.8122545833), (37.9084821512, 3.9644819065))
            Line((37.9084821512, 3.9644819065), (36.0141244305, 3.9644819065))
            Line((36.0141244305, 3.9644819065), (35.3531434992, 0.8094904509))
            Line((35.3531434992, 0.8094904509), (27.8779261628, 0.8094904509))
            Line((27.8779261628, 0.8094904509), (27.8779261628, 11.289786042))
            Line((27.8779261628, 11.289786042), (32.3071798261, 11.289786042))
            add(Edge.make_bspline(
                [(39.2100013045, 10.9899596402), (36.8250185627, 11.289786042), (32.3071798261, 11.289786042)],
                knots=[0, 0, 0, 1, 1, 1], degree=2))
            Line((39.2100013045, 10.9899596402), (39.8914249451, 6.3699073575))
            Line((39.8914249451, 6.3699073575), (41.8266680841, 6.3699073575))
            Line((41.8266680841, 6.3699073575), (41.8266680841, 13.6338833654))
            Line((41.8266680841, 13.6338833654), (17.5066583542, 13.6338833654))
            Line((17.5066583542, 13.6338833654), (17.5066583542, 12.080237465))
            Line((17.5066583542, 12.080237465), (21.1727175402, 11.5214700798))
            Line((21.1727175402, 11.5214700798), (21.1727175402, -12.7917254137))
            Line((21.1727175402, -12.7917254137), (17.5066583542, -13.3709355081))
            Line((17.5066583542, -13.3709355081), (17.5066583542, -14.9245814085))
        make_face()
    extrude(amount=F1_DEPTH)


solid = f1.part
